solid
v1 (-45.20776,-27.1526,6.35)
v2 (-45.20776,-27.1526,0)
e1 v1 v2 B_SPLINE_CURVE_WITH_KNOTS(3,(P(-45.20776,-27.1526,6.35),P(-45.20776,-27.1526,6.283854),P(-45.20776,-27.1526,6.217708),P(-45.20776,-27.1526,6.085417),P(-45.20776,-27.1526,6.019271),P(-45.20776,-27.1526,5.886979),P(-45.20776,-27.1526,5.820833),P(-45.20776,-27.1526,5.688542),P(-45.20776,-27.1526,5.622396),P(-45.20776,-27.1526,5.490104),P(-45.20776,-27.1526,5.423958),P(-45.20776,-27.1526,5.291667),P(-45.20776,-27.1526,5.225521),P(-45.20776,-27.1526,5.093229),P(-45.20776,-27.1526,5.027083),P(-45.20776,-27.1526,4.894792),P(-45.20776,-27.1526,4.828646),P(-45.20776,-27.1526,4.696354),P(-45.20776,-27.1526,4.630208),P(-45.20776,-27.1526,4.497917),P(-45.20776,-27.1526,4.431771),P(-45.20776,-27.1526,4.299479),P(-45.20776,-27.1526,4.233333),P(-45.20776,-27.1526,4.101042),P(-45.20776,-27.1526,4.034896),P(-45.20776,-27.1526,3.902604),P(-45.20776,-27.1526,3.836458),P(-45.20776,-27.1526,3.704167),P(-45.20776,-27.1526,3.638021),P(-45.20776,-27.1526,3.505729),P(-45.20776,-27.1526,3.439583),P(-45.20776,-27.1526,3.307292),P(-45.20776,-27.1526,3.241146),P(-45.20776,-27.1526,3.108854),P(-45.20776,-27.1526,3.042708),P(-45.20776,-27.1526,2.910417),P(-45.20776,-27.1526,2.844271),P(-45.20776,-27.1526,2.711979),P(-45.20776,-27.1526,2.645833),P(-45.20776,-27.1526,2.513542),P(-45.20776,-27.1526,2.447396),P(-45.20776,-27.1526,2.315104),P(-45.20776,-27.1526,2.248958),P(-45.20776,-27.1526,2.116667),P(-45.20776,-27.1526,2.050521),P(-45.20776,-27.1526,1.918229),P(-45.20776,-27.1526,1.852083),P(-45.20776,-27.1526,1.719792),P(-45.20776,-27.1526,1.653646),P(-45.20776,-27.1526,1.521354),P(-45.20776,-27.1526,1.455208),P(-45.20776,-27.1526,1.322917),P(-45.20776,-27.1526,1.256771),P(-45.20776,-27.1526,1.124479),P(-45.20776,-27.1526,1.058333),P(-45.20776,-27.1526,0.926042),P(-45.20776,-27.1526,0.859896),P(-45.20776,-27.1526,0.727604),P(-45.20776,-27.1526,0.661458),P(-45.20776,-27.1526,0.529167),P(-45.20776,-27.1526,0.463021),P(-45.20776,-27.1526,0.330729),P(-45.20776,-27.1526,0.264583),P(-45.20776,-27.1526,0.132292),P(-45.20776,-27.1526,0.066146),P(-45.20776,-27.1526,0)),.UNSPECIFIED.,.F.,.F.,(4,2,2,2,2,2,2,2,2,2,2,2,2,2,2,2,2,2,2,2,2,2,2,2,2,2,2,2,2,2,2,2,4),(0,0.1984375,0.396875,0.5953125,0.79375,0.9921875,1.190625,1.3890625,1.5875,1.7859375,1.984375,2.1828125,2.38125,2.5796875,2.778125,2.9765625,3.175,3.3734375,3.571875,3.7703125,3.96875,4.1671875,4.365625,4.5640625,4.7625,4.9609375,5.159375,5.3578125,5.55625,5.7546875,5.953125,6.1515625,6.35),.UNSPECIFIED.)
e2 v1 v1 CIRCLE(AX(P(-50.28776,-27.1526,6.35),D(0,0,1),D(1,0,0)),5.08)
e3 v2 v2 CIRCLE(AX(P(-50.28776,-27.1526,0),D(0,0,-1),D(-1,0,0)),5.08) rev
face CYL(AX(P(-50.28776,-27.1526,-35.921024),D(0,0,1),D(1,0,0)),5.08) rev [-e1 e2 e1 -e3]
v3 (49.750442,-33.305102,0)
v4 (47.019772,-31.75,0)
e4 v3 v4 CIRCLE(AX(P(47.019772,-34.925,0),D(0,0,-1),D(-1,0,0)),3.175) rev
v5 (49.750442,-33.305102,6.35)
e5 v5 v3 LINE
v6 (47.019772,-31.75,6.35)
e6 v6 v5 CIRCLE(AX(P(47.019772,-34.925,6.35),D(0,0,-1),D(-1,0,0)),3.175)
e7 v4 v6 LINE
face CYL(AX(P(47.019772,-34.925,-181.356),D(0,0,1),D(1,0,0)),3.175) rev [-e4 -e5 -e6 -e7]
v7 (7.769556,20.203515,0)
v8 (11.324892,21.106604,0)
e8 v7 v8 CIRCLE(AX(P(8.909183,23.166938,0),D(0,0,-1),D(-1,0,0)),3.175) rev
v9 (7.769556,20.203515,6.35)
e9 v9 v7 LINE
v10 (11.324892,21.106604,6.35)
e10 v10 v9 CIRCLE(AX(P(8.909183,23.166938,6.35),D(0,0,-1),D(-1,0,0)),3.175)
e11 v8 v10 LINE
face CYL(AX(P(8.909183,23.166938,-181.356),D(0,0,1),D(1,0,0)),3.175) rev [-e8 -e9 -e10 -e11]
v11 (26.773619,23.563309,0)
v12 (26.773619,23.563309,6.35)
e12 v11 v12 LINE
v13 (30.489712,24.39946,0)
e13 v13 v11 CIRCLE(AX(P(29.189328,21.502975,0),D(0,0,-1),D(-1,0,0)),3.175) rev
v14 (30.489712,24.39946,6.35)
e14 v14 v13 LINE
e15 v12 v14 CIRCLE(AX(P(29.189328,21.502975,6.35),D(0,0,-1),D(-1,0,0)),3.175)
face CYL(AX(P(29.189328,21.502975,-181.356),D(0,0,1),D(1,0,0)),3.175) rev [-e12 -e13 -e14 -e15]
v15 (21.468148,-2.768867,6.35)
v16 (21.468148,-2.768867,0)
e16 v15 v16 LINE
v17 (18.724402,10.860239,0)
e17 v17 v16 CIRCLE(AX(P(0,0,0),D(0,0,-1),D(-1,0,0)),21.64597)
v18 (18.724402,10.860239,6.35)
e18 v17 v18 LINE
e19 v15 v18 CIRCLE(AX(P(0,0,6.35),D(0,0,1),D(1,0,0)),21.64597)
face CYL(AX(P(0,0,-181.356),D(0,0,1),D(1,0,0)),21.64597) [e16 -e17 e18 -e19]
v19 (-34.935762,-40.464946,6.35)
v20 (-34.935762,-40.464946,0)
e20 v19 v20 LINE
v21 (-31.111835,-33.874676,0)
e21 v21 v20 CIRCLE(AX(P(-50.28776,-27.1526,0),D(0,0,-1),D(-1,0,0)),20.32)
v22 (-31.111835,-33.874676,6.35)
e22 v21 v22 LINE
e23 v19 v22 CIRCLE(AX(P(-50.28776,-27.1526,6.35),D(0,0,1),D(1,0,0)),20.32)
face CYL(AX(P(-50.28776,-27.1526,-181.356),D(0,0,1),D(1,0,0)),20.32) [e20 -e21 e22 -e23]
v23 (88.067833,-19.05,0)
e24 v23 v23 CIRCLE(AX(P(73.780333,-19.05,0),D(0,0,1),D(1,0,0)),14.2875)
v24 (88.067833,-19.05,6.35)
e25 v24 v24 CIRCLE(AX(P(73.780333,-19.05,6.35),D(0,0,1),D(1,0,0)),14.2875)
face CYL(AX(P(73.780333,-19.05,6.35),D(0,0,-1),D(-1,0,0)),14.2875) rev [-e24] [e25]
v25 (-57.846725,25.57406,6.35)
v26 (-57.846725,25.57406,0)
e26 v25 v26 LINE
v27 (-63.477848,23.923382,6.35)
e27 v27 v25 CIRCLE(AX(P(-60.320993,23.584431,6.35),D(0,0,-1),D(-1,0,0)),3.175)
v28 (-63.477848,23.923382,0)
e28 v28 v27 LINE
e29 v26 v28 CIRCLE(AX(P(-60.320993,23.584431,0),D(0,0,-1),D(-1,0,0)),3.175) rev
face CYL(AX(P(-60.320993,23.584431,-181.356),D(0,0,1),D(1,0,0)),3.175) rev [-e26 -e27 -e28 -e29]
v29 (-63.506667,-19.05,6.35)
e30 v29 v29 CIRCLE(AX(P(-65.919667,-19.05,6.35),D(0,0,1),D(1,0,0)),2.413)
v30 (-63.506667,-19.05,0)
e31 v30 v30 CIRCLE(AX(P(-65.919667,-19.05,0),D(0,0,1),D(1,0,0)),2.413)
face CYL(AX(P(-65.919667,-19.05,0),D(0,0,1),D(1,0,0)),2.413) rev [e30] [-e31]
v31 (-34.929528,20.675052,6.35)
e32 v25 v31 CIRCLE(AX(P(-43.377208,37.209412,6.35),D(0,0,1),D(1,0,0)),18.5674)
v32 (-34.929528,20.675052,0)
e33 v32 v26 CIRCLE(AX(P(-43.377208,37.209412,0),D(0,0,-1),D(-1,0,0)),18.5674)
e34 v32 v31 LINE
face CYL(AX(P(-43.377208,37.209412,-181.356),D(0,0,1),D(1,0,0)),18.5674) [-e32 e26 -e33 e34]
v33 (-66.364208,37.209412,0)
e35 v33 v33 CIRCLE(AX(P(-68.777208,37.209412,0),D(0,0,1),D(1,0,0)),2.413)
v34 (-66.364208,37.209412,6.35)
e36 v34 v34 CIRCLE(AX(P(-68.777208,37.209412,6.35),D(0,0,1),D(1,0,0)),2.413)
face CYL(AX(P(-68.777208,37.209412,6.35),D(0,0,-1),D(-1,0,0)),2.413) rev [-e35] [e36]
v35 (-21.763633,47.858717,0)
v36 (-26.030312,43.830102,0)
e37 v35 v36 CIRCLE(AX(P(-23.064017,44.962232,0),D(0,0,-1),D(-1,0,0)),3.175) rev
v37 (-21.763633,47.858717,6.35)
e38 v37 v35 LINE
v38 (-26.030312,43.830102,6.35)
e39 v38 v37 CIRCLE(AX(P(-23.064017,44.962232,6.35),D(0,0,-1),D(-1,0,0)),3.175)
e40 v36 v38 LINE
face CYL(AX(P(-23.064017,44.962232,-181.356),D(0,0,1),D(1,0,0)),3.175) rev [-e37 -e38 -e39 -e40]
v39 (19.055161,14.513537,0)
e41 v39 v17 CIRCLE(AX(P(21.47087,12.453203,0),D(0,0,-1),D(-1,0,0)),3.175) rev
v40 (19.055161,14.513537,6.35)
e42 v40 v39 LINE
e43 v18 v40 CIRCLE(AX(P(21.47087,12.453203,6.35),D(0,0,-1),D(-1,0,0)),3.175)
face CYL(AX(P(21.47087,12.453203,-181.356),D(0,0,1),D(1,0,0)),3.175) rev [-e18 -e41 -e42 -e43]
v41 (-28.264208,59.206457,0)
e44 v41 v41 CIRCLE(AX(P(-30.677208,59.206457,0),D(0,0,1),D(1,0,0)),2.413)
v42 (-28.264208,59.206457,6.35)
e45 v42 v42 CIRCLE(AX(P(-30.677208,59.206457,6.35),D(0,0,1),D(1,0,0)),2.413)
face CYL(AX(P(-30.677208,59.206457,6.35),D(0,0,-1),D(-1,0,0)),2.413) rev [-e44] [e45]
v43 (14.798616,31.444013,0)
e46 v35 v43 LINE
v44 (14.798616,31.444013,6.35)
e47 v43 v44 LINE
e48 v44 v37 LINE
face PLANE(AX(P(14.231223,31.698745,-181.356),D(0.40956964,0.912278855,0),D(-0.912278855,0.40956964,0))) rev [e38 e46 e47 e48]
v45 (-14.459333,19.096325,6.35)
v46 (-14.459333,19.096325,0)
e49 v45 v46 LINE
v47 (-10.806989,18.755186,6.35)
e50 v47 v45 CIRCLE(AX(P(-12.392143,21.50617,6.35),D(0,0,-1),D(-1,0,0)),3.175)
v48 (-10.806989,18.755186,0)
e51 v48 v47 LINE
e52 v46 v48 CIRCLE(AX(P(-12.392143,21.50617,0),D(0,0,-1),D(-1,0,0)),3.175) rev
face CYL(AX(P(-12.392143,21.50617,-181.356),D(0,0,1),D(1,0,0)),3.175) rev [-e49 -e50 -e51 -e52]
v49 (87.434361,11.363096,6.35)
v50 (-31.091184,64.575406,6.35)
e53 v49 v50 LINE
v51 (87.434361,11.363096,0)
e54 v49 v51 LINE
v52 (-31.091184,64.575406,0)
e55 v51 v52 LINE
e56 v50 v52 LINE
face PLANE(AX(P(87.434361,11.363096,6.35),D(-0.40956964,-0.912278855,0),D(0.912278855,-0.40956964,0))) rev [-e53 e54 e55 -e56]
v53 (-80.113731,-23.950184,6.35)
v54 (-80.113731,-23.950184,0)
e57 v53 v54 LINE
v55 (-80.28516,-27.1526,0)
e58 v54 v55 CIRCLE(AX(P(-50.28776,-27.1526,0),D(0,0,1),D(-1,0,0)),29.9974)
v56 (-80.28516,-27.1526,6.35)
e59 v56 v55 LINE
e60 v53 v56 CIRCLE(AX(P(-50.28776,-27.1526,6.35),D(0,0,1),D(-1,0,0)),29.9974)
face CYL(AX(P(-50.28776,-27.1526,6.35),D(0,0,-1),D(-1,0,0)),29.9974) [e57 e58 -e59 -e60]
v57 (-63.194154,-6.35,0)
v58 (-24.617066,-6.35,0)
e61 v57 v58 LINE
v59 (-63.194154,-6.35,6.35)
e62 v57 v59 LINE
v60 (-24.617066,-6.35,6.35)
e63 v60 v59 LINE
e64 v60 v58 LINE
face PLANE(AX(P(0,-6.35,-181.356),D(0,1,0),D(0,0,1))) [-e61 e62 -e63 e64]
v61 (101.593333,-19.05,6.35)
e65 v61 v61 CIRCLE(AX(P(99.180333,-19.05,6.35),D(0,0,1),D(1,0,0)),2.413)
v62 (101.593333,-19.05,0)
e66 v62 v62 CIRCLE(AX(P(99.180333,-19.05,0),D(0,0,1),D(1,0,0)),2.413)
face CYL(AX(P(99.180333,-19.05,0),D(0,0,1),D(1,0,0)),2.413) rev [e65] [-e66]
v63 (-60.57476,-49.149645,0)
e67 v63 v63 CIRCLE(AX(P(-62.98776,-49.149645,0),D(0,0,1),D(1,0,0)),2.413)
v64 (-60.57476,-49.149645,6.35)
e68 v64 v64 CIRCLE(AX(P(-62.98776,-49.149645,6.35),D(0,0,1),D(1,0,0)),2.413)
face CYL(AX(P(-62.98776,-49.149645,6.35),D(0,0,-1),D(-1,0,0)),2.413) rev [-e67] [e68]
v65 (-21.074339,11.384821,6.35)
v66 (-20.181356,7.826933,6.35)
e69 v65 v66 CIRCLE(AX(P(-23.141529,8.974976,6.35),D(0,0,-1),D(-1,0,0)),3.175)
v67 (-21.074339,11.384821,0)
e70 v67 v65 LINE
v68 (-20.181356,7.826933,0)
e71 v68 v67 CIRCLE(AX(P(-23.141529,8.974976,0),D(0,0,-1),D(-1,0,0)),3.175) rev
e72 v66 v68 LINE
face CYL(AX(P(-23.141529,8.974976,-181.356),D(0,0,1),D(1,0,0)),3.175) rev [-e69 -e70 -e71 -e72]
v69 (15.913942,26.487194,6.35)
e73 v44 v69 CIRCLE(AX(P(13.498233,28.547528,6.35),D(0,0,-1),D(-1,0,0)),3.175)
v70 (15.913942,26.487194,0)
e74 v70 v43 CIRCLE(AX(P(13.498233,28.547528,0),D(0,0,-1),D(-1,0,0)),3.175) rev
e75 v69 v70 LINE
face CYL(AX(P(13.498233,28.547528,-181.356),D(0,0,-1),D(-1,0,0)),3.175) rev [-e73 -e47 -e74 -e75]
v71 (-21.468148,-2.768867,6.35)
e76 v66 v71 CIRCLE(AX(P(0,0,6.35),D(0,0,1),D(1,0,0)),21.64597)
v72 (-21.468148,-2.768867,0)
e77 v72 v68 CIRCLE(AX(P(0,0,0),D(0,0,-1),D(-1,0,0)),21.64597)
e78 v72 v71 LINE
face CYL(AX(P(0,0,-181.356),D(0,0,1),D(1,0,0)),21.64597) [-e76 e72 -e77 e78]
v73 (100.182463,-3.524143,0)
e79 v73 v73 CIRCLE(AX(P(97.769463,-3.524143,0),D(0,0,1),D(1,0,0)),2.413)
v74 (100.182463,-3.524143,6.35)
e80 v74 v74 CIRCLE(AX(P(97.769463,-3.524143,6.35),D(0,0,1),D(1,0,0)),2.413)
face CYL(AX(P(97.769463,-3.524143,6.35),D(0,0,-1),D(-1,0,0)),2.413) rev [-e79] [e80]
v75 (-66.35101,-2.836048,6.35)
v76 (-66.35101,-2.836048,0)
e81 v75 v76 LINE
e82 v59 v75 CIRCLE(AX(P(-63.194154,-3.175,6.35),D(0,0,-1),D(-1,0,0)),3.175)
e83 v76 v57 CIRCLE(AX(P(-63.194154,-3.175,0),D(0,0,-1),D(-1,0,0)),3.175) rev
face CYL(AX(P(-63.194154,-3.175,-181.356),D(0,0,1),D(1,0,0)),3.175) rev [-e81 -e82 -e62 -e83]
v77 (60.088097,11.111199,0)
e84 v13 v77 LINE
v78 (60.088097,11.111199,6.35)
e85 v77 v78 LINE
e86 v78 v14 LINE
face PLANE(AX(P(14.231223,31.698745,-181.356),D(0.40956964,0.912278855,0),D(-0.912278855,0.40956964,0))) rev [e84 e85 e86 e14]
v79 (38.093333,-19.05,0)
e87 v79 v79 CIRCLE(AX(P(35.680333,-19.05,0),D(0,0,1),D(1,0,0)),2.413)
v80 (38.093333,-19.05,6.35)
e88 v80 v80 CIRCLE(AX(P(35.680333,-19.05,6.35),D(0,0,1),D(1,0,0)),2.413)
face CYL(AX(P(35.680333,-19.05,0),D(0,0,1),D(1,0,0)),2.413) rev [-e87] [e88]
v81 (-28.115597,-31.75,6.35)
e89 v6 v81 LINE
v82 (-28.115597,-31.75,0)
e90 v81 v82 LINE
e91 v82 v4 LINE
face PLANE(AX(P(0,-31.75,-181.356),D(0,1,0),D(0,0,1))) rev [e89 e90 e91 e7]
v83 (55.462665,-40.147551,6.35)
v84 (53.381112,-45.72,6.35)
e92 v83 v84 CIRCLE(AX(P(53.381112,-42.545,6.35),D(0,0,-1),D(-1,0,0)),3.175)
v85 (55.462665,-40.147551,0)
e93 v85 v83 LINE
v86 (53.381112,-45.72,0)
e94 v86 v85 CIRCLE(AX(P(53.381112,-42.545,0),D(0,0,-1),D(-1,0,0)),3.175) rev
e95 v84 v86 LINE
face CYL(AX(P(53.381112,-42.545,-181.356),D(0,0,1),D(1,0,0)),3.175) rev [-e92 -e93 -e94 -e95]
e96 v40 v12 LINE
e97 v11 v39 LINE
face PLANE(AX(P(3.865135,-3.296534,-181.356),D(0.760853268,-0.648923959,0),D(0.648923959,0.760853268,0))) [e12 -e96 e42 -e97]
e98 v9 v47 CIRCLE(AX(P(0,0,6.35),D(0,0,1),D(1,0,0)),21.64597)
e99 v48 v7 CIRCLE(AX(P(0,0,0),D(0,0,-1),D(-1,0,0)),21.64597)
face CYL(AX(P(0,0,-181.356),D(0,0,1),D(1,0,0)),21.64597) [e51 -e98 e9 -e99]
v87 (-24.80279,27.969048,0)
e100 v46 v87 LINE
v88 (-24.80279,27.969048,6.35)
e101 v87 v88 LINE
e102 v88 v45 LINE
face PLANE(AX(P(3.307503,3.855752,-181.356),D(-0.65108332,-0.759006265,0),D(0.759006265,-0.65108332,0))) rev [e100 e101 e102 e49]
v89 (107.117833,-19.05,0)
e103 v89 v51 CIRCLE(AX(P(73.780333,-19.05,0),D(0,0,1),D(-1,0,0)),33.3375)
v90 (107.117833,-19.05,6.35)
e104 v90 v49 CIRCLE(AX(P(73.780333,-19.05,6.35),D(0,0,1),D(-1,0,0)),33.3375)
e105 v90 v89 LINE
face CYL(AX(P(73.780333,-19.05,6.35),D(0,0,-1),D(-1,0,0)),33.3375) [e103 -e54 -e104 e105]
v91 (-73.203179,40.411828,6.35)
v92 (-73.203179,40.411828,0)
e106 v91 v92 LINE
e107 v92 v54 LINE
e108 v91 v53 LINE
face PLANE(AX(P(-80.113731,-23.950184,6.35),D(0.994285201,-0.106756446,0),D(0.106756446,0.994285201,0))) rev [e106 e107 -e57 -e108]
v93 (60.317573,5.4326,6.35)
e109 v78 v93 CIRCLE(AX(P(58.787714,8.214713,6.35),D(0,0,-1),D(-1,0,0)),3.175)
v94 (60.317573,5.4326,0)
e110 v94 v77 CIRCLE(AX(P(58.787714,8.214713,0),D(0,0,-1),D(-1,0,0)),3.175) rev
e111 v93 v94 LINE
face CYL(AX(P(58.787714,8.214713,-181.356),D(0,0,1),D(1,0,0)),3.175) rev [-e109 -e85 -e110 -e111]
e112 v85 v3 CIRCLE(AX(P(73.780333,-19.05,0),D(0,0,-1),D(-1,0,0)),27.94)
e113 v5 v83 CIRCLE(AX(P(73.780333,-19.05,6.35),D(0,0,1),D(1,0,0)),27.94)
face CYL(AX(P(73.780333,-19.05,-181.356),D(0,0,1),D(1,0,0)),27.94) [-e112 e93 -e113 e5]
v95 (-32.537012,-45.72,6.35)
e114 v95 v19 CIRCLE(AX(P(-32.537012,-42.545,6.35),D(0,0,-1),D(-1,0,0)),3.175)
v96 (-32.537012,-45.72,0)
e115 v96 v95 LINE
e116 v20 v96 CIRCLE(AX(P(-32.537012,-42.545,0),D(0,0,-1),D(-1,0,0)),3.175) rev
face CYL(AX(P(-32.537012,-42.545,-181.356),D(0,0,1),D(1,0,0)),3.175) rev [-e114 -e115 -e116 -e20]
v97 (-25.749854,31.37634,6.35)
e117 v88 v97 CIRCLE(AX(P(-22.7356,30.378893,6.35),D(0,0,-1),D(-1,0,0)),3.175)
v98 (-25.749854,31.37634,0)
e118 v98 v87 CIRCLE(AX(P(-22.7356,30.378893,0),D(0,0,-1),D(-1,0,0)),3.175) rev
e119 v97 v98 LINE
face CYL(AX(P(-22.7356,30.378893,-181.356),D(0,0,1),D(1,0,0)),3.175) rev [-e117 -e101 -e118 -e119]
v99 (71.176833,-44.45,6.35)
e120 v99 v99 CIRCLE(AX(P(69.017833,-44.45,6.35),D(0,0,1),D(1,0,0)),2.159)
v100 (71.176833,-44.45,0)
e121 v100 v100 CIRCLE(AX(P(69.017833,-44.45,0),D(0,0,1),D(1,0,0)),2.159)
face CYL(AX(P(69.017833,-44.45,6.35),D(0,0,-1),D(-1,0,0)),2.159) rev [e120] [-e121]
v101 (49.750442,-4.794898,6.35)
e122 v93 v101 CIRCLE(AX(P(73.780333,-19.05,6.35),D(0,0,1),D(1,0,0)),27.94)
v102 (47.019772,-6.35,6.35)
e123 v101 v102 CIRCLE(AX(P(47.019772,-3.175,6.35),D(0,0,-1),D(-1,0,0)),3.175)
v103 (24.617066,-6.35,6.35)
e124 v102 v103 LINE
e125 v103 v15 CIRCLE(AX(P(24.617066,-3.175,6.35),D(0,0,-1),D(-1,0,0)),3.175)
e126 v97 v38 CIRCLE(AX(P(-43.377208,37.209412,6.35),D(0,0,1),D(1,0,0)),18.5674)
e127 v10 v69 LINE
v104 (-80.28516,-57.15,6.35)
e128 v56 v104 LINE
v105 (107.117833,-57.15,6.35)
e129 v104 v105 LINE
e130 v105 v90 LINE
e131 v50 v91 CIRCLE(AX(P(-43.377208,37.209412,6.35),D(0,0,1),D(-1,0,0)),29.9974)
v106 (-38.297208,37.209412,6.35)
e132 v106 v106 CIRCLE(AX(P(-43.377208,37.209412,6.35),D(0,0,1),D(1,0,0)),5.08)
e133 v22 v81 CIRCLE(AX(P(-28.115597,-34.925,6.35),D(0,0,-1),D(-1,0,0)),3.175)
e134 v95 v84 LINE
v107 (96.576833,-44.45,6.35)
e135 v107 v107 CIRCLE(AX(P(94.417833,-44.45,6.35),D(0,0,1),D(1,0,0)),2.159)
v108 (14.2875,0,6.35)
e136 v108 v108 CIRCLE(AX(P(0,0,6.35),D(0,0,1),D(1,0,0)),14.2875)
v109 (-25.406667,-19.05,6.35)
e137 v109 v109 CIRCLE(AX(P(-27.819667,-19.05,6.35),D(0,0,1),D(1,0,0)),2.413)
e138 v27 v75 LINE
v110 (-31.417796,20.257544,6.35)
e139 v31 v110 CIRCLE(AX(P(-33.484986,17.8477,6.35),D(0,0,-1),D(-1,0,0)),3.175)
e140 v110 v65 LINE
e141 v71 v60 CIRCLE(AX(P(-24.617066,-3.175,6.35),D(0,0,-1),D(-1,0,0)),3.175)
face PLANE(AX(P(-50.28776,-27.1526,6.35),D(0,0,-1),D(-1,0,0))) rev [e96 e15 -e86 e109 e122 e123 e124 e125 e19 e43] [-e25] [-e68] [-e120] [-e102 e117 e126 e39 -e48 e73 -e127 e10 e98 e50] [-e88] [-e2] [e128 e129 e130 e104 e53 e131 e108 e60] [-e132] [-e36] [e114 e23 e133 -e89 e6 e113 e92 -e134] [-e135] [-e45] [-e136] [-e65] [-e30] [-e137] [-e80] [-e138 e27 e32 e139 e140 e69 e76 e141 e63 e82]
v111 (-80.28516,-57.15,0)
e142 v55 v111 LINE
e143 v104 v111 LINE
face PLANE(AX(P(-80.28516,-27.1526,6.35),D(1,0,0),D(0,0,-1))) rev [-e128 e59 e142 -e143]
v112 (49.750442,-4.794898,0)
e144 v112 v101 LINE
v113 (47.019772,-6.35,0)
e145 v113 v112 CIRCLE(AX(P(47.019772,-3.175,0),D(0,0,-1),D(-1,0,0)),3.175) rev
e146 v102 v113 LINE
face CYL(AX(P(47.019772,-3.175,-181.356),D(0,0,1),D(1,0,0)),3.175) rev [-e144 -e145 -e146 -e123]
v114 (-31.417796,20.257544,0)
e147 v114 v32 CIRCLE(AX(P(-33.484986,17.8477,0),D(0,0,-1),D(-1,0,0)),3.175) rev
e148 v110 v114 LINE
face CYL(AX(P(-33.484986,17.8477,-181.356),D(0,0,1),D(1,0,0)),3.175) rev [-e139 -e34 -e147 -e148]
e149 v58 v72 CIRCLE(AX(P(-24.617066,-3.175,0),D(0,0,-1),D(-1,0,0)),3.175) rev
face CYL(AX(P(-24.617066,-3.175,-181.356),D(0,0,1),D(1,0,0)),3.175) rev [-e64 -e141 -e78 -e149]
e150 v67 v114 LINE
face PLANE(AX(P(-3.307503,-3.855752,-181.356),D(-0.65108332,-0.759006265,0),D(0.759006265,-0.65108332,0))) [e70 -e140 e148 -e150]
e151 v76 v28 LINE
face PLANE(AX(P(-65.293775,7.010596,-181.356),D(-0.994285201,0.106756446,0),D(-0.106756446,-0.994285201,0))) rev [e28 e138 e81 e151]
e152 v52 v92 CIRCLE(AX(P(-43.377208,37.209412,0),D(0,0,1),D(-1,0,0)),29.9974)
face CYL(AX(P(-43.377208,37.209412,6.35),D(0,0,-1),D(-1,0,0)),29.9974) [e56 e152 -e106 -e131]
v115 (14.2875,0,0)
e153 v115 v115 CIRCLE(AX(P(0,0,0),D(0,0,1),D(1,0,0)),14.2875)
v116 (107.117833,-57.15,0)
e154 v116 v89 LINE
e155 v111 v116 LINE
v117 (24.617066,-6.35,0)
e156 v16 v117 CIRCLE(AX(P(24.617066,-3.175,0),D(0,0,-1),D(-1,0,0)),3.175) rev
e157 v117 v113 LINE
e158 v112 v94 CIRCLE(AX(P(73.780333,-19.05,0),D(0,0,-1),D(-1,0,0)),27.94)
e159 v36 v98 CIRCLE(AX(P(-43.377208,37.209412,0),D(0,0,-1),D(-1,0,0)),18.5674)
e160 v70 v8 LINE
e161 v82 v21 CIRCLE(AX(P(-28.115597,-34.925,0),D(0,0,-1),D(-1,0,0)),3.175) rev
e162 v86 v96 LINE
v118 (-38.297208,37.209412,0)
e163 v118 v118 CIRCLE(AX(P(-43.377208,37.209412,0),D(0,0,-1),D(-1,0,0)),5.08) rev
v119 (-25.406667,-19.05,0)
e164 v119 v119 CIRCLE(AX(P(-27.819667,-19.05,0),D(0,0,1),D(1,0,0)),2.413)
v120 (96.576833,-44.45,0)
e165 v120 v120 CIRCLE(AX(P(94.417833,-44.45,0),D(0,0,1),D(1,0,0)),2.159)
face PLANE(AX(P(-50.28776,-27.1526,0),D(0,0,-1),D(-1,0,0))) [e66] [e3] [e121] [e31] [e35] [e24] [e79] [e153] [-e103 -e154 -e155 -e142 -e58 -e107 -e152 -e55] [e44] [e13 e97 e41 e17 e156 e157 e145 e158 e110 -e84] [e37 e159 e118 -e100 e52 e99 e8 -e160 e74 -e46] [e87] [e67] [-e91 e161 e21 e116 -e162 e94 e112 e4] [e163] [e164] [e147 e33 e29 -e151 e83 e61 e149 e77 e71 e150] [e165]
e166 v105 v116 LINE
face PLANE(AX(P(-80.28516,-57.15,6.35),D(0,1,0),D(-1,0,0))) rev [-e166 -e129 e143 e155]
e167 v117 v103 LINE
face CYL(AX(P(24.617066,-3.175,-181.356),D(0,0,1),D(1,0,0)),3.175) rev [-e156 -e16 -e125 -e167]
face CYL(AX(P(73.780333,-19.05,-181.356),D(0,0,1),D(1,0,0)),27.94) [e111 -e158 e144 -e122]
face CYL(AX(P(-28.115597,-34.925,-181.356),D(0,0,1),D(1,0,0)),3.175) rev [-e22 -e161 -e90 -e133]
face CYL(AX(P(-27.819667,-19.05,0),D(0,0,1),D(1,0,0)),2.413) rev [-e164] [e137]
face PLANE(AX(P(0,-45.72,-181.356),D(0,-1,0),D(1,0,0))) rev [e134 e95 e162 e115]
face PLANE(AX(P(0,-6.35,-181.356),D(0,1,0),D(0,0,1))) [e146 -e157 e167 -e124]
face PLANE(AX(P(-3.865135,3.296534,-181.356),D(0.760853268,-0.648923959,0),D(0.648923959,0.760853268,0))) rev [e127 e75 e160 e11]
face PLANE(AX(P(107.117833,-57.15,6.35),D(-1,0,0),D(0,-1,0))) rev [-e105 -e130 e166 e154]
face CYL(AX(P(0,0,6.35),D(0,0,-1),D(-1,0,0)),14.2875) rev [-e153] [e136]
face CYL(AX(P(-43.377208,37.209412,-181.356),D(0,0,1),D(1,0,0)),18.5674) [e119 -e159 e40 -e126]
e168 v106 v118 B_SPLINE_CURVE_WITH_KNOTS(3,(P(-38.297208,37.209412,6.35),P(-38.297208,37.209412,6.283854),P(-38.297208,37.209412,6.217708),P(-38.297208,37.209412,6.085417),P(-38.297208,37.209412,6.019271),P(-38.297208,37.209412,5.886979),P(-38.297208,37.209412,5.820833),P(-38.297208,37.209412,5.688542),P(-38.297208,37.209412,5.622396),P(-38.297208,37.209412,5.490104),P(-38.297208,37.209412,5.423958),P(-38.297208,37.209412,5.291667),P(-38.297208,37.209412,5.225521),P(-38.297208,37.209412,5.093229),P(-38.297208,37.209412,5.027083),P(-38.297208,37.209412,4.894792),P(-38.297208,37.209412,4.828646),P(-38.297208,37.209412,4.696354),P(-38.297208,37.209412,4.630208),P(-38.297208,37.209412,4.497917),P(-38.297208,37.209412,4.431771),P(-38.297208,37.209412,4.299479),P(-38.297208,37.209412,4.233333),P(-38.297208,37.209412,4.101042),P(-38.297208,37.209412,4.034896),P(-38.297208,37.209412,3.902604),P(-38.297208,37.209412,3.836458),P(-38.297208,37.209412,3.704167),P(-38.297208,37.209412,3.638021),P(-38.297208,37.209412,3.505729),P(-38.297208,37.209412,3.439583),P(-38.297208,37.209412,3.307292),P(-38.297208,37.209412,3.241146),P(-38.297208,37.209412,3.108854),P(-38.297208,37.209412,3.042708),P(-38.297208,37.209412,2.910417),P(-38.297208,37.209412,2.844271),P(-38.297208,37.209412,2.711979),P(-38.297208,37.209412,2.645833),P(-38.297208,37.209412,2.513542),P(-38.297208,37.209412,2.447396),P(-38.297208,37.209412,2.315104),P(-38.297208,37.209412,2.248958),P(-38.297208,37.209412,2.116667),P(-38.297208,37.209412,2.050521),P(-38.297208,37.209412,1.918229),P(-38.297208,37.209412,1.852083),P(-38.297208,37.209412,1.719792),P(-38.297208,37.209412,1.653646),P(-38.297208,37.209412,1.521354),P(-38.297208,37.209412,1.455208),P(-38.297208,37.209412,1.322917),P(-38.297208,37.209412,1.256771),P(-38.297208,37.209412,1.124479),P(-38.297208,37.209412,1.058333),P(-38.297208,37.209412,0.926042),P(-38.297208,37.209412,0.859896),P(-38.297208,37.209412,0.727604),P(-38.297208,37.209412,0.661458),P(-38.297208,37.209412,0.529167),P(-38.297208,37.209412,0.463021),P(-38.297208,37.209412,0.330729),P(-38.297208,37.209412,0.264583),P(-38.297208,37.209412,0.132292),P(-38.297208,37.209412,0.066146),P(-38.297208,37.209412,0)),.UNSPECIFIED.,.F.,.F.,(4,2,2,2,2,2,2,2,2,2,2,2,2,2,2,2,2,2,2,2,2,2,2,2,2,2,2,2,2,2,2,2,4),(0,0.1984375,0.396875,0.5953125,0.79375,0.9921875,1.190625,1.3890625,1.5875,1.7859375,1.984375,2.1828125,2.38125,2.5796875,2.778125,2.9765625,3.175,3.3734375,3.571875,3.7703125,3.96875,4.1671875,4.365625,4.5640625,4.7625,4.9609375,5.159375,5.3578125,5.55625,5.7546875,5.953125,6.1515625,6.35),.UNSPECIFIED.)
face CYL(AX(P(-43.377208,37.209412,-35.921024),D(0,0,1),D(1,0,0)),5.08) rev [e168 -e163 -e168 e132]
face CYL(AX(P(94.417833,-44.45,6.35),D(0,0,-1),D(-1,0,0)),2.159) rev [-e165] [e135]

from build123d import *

# Parameters (mm, degrees)
SKETCH1_R           = 14.2875
SKETCH1_R_2         = 12.7
SKETCH1_R_3         = 2.413
SKETCH1_R_4         = 2.159
BOSS_EXTRUDE1_DEPTH = 6.35
BOSS_EXTRUDE2_START = -6.35
SKETCH2_R           = 2.413
SKETCH2_R_2         = 2.685559378
SKETCH2_R_3         = 7.691429031
SKETCH2_R_4         = 5.034548369
SKETCH2_R_5         = 5.920725106
SKETCH2_R_6         = 7.734401209
SKETCH2_R_7         = 5.621863984
SKETCH2_R_8         = 3.605638589
BOSS_EXTRUDE2_DEPTH = 6.35
SKETCH3_R           = 2.413
CUT_EXTRUDE1_DEPTH  = 127.614802212
BOSS_EXTRUDE3_START = -6.35
SKETCH4_R           = 12.7
SKETCH4_R_2         = 5.08
BOSS_EXTRUDE3_DEPTH = 6.35
CUT_EXTRUDE3_DEPTH  = 187.706
FILLET2_R           = 3.175


with BuildPart() as part:
    # Sketch1 → Boss-Extrude1 (new body)
    with BuildSketch(Plane.XY):
        with BuildLine():
            Line((-80.285160074, -57.15), (107.117832745, -57.15))
            Line((107.117832745, -57.15), (107.117832745, -19.05))
            ThreePointArc((107.117832745, -19.05), (101.76765184, -0.936500169), (87.434360611, 11.363096345))
            Line((87.434360611, 11.363096345), (-31.091183717, 64.575405501))
            ThreePointArc((-31.091183717, 64.575405501), (-58.306442976, 63.227904236), (-73.203178923, 40.411827573))
            Line((-73.203178923, 40.411827573), (-80.113730967, -23.950184188))
            ThreePointArc((-80.113730967, -23.950184188), (-80.242272138, -25.549099535), (-80.285160074, -27.1526))
            Line((-80.285160074, -27.1526), (-80.285160074, -57.15))
        make_face()
        Circle(SKETCH1_R, mode=Mode.SUBTRACT)
        with Locations((-43.377208029, 37.209411761)):
            Circle(SKETCH1_R_2, mode=Mode.SUBTRACT)
        with Locations((-50.287760074, -27.1526)):
            Circle(SKETCH1_R_2, mode=Mode.SUBTRACT)
        with Locations((73.780332745, -19.05)):
            Circle(SKETCH1_R, mode=Mode.SUBTRACT)
        with Locations((-68.777208029, 37.209411761)):
            Circle(SKETCH1_R_3, mode=Mode.SUBTRACT)
        with Locations((-17.977208029, 37.209411761)):
            Circle(SKETCH1_R_3, mode=Mode.SUBTRACT)
        with Locations((-56.077208029, 59.206457017)):
            Circle(SKETCH1_R_3, mode=Mode.SUBTRACT)
        with Locations((-30.677208029, 59.206457017)):
            Circle(SKETCH1_R_3, mode=Mode.SUBTRACT)
        with Locations((-56.077208029, 15.212366505)):
            Circle(SKETCH1_R_3, mode=Mode.SUBTRACT)
        with Locations((-30.677208029, 15.212366505)):
            Circle(SKETCH1_R_3, mode=Mode.SUBTRACT)
        with Locations((-62.987760074, -5.155554744)):
            Circle(SKETCH1_R_3, mode=Mode.SUBTRACT)
        with Locations((-75.687760074, -27.1526)):
            Circle(SKETCH1_R_3, mode=Mode.SUBTRACT)
        with Locations((-62.987760074, -49.149645256)):
            Circle(SKETCH1_R_3, mode=Mode.SUBTRACT)
        with Locations((-37.587760074, -49.149645256)):
            Circle(SKETCH1_R_3, mode=Mode.SUBTRACT)
        with Locations((-24.887760074, -27.1526)):
            Circle(SKETCH1_R_3, mode=Mode.SUBTRACT)
        with Locations((-37.587760074, -5.155554744)):
            Circle(SKETCH1_R_3, mode=Mode.SUBTRACT)
        with Locations((94.417832745, -44.45)):
            Circle(SKETCH1_R_4, mode=Mode.SUBTRACT)
        with Locations((97.769463398, -3.524143002)):
            Circle(SKETCH1_R_3, mode=Mode.SUBTRACT)
        with Locations((69.017832745, -44.45)):
            Circle(SKETCH1_R_4, mode=Mode.SUBTRACT)
    extrude(amount=BOSS_EXTRUDE1_DEPTH)

    # Sketch2 → Boss-Extrude2 (add)
    with BuildSketch(Plane.XY.offset(6.35).offset(BOSS_EXTRUDE2_START)):
        with Locations((-56.077208029, 59.206457017)):
            Circle(SKETCH2_R)
        with Locations((-17.977208029, 37.209411761)):
            Circle(SKETCH2_R_2)
        with Locations((-30.677208029, 15.212366505)):
            Circle(SKETCH2_R_3)
        with Locations((-56.077208029, 15.212366505)):
            Circle(SKETCH2_R_4)
        with Locations((-75.687760074, -27.1526)):
            Circle(SKETCH2_R)
        with Locations((-37.587760074, -49.149645256)):
            Circle(SKETCH2_R_5)
        with Locations((-24.887760074, -27.1526)):
            Circle(SKETCH2_R_6)
        with Locations((-37.587760074, -5.155554744)):
            Circle(SKETCH2_R_7)
        with Locations((-62.987760074, -5.155554744)):
            Circle(SKETCH2_R_8)
    extrude(amount=BOSS_EXTRUDE2_DEPTH)

    # Sketch3 → Cut-Extrude1 (cut, through all)
    with BuildSketch(Plane.XY.offset(6.35)):
        with Locations((-65.919667255, -19.05)):
            Circle(SKETCH3_R)
        with Locations((-27.819667255, -19.05)):
            Circle(SKETCH3_R)
        with Locations((99.180332745, -19.05)):
            Circle(SKETCH3_R)
        with Locations((35.680332745, -19.05)):
            Circle(SKETCH3_R)
    extrude(amount=-CUT_EXTRUDE1_DEPTH, mode=Mode.SUBTRACT)

    # Sketch4 → Boss-Extrude3 (add)
    # profile 1 of 2: a face of its own
    with BuildSketch(Plane.XY.offset(6.35).offset(BOSS_EXTRUDE3_START)):
        with Locations((-50.287760074, -27.1526)):
            Circle(SKETCH4_R)
        with Locations((-50.287760074, -27.1526)):
            Circle(SKETCH4_R_2, mode=Mode.SUBTRACT)
    # profile 2 of 2: a face of its own
    with BuildSketch(Plane.XY.offset(6.35).offset(BOSS_EXTRUDE3_START)):
        with Locations((-43.377208029, 37.209411761)):
            Circle(SKETCH4_R)
        with Locations((-43.377208029, 37.209411761)):
            Circle(SKETCH4_R_2, mode=Mode.SUBTRACT)
    extrude(amount=BOSS_EXTRUDE3_DEPTH)

    # Sketch6 → Cut-Extrude3 (cut)
    with BuildSketch(Plane.XY.offset(6.35)):
        with BuildLine():
            Line((48.893516959, -31.75), (-30.494672562, -31.75))
            ThreePointArc((-30.494672562, -31.75), (-34.620223563, -40.092101524), (-42.032213015, -45.72))
            Line((-42.032213015, -45.72), (65.452385819, -45.72))
            ThreePointArc((65.452385819, -45.72), (55.763803098, -40.405286453), (48.893516959, -31.75))
        make_face()
        with BuildLine():
            ThreePointArc((21.645969932, 0), (21.406556056, -3.210509638), (20.69361047, -6.35))
            Line((20.69361047, -6.35), (48.893516959, -6.35))
            ThreePointArc((48.893516959, -6.35), (56.358698753, 2.793311769), (66.933289757, 8.038034302))
            Line((66.933289757, 8.038034302), (28.318236786, 25.374349004))
            Line((28.318236786, 25.374349004), (17.519420156, 12.712904141))
            ThreePointArc((17.519420156, 12.712904141), (20.588502328, 6.682932454), (21.645969932, 0))
        make_face()
        with BuildLine():
            Line((-66.728302826, -6.35), (-20.69361047, -6.35))
            ThreePointArc((-20.69361047, -6.35), (-21.56374561, 1.884911026), (-19.278077532, 9.843969777))
            Line((-19.278077532, 9.843969777), (-33.129659603, 21.725998248))
            ThreePointArc((-33.129659603, 21.725998248), (-53.027504153, 21.346873266), (-61.838499073, 39.191601395))
            Line((-61.838499073, 39.191601395), (-66.728302826, -6.35))
        make_face()
        with BuildLine():
            Line((18.662178143, 29.709458205), (-35.7725647, 54.148058182))
            ThreePointArc((-35.7725647, 54.148058182), (-27.789604023, 47.297768619), (-24.809808029, 37.209411761))
            ThreePointArc((-24.809808029, 37.209411761), (-25.241026709, 33.231061615), (-26.514653067, 29.437501898))
            Line((-26.514653067, 29.437501898), (-12.663070997, 17.555473427))
            ThreePointArc((-12.663070997, 17.555473427), (-1.682532329, 21.580479588), (9.789150952, 19.305971562))
            Line((9.789150952, 19.305971562), (18.662178143, 29.709458205))
        make_face()
    extrude(amount=-CUT_EXTRUDE3_DEPTH, mode=Mode.SUBTRACT)

    # Fillet2
    # the kernel refuses this fillet: 3.175 mm, written as the material it adds along each edge
    with BuildSketch(Plane(origin=(-42.032213015, -45.72, 6.35), x_dir=(0.8036425681302507, 0.5951122773805085, 0), z_dir=(0, 0, -1))) as fillet2_piece_1:
        with BuildLine():
            CenterArc((9.520228984, 3.09914538), FILLET2_R, 126.520636513, 130.92989741)
            Line((7.630747504, 5.650710534), (0, 0))
            ThreePointArc((0, 0), (4.415178659, 0.485469569), (8.830357319, 0))
        make_face()
    extrude(amount=6.35)
    with BuildSketch(Plane(origin=(-30.494672562, -31.75, 6.35), x_dir=(1, 0, 0), z_dir=(0, 0, -1))) as fillet2_piece_2:
        with BuildLine():
            CenterArc((2.37907574, 3.175), FILLET2_R, 199.317995786, 70.682004214)
            ThreePointArc((-0.617162538, 2.124675676), (-0.27964227, 1.070743858), (0, 0))
            Line((0, 0), (2.37907574, 0))
        make_face()
    extrude(amount=6.35)
    with BuildSketch(Plane(origin=(48.893516959, -31.75, 6.35), x_dir=(-1, 0, 0), z_dir=(0, 0, -1))) as fillet2_piece_3:
        with BuildLine():
            CenterArc((1.873744746, -3.175), FILLET2_R, 90, 59.322575527)
            ThreePointArc((-0.856924696, -1.555102041), (-0.416105979, -0.784359884), (0, 0))
            Line((0, 0), (1.873744746, 0))
        make_face()
    extrude(amount=6.35)
    with BuildSketch(Plane(origin=(65.452385819, -45.72, 6.35), x_dir=(-1, 0, 0), z_dir=(0, 0, -1))) as fillet2_piece_4:
        with BuildLine():
            CenterArc((12.071273647, 3.175), FILLET2_R, 130.96571333, 139.03428667)
            ThreePointArc((9.989720528, 5.57244898), (5.283086772, 2.269521282), (0, 0))
            Line((0, 0), (12.071273647, 0))
        make_face()
    extrude(amount=6.35)
    with BuildSketch(Plane(origin=(-26.514653067, 29.437501898, 6.35), x_dir=(0.3669458534357753, 0.9302423021161157, 0), z_dir=(0, 0, -1))) as fillet2_piece_5:
        with BuildLine():
            CenterArc((2.262429591, 3.16999522), FILLET2_R, 199.095946459, 67.686577367)
            Line((-0.737856699, 2.131290651), (0, 0))
            ThreePointArc((0, 0), (1.042114701, 0.029267955), (2.084229403, 0))
        make_face()
    extrude(amount=6.35)
    with BuildSketch(Plane(origin=(-35.7725647, 54.148058182, 6.35), x_dir=(0.9122788554907602, -0.40956963977383487, 0), z_dir=(0, 0, -1))) as fillet2_piece_6:
        with BuildLine():
            CenterArc((15.355975384, 3.175), FILLET2_R, 134.932127283, 135.067872717)
            ThreePointArc((13.113572437, 5.422721963), (7.095274757, 1.409153619), (0, 0))
            Line((0, 0), (15.355975384, 0))
        make_face()
    extrude(amount=6.35)
    with BuildSketch(Plane(origin=(18.662178143, 29.709458205, 6.35), x_dir=(-0.6489239587910223, -0.7608532681844692, 0), z_dir=(0, 0, -1))) as fillet2_piece_7:
        with BuildLine():
            CenterArc((FILLET2_R * 1.33387923601, FILLET2_R), FILLET2_R, 163.717281089, 106.282718911)
            Line((FILLET2_R * 0.373989335277, FILLET2_R * 1.28037720746), (0, 0))
            Line((0, 0), (FILLET2_R * 1.33387923601, 0))
        make_face()
    extrude(amount=6.35)
    with BuildSketch(Plane(origin=(9.789150952, 19.305971562, 6.35), x_dir=(0.648923958791122, 0.7608532681843841, 0), z_dir=(0, 0, -1))) as fillet2_piece_8:
        with BuildLine():
            CenterArc((2.366596481, -3.175), FILLET2_R, 90, 70.574451628)
            ThreePointArc((-0.627664905, -2.119053151), (-0.286770358, -1.067542385), (0, 0))
            Line((0, 0), (2.366596481, 0))
        make_face()
    extrude(amount=6.35)
    with BuildSketch(Plane(origin=(-12.663070997, 17.555473427, 6.35), x_dir=(-0.7590062647283117, 0.6510833204000669, 0), z_dir=(0, 0, -1)), Plane(origin=(17.519420156, 12.712904141, 6.35), x_dir=(0.6489239587910582, 0.7608532681844384, 0), z_dir=(0, 0, -1))) as fillet2_piece_9:
        with BuildLine():
            CenterArc((2.366596481, 3.175), FILLET2_R, 199.425548372, 70.574451628)
            ThreePointArc((-0.627664905, 2.119053151), (-0.286770358, 1.067542385), (0, 0))
            Line((0, 0), (2.366596481, 0))
        make_face()
    extrude(amount=6.35)
    with BuildSketch(Plane(origin=(-61.838499073, 39.191601395, 6.35), x_dir=(-0.10675644594996386, -0.9942852011611821, 0), z_dir=(0, 0, -1))) as fillet2_piece_10:
        with BuildLine():
            CenterArc((15.355975384, -3.175), FILLET2_R, 90, 135.067872717)
            ThreePointArc((13.113572437, -5.422721963), (7.095274757, -1.409153619), (0, 0))
            Line((0, 0), (15.355975384, 0))
        make_face()
    extrude(amount=6.35)
    with BuildSketch(Plane(origin=(-33.129659603, 21.725998248, 6.35), x_dir=(0.7590062647282139, -0.6510833204001809, 0), z_dir=(0, 0, -1))) as fillet2_piece_11:
        with BuildLine():
            CenterArc((2.255400706, 3.175), FILLET2_R, 202.313422633, 67.686577367)
            ThreePointArc((-0.681857828, 1.969538551), (-0.313271514, 0.994344318), (0, 0))
            Line((0, 0), (2.255400706, 0))
        make_face()
    extrude(amount=6.35)
    with BuildSketch(Plane(origin=(-19.278077532, 9.843969777, 6.35), x_dir=(-0.40871289434840824, -0.9126630100937293, 0), z_dir=(0, 0, -1))) as fillet2_piece_12:
        with BuildLine():
            CenterArc((2.372140408, 3.170860102), FILLET2_R, 196.499323021, 70.574451628)
            Line((-0.672122904, 2.269147352), (0, 0))
            ThreePointArc((0, 0), (1.105028222, 0.028224283), (2.210056445, 0))
        make_face()
    extrude(amount=6.35)
    with BuildSketch(Plane(origin=(-20.69361047, -6.35, 6.35), x_dir=(-1, 0, 0), z_dir=(0, 0, -1))) as fillet2_piece_13:
        with BuildLine():
            CenterArc((3.923455223, 3.175), FILLET2_R, 172.650815641, 97.349184359)
            ThreePointArc((0.774537845, 3.581133404), (0.463175795, 1.774149345), (0, 0))
            Line((0, 0), (3.923455223, 0))
        make_face()
    extrude(amount=6.35)
    with BuildSketch(Plane(origin=(-66.728302826, -6.35, 6.35), x_dir=(0.10675644594995837, 0.9942852011611827, 0), z_dir=(0, 0, -1))) as fillet2_piece_14:
        with BuildLine():
            CenterArc((FILLET2_R * 1.11311768963, FILLET2_R), FILLET2_R, 173.871627619, 96.128372381)
            Line((FILLET2_R * 0.118832488469, FILLET2_R * 1.10675644595), (0, 0))
            Line((0, 0), (FILLET2_R * 1.11311768963, 0))
        make_face()
    extrude(amount=6.35)
    with BuildSketch(Plane(origin=(66.933289757, 8.038034302, 6.35), x_dir=(-0.9304446977974599, -0.3664323461985766, 0), z_dir=(0, 0, -1))) as fillet2_piece_15:
        with BuildLine():
            CenterArc((7.514267093, 3.149192718), FILLET2_R, 135.673561463, 127.0162006)
            Line((5.242966133, 5.367709553), (0, 0))
            ThreePointArc((0, 0), (3.555137119, 0.227104084), (7.110274239, 0))
        make_face()
    extrude(amount=6.35)
    with BuildSketch(Plane(origin=(48.893516959, -6.35, 6.35), x_dir=(-1, 0, 0), z_dir=(0, 0, -1))) as fillet2_piece_16:
        with BuildLine():
            CenterArc((1.873744746, 3.175), FILLET2_R, 210.677424473, 59.322575527)
            ThreePointArc((-0.856924696, 1.555102041), (-0.416105979, 0.784359884), (0, 0))
            Line((0, 0), (1.873744746, 0))
        make_face()
    extrude(amount=6.35)
    with BuildSketch(Plane(origin=(20.69361047, -6.35, 6.35), x_dir=(1, 0, 0), z_dir=(0, 0, -1))) as fillet2_piece_17:
        with BuildLine():
            CenterArc((3.923455223, -3.175), FILLET2_R, 90, 97.349184359)
            ThreePointArc((0.774537845, -3.581133404), (0.463175795, -1.774149345), (0, 0))
            Line((0, 0), (3.923455223, 0))
        make_face()
    extrude(amount=6.35)
    with BuildSketch(Plane(origin=(28.318236786, 25.374349004, 6.35), x_dir=(0.9122788554907597, -0.4095696397738357, 0), z_dir=(0, 0, -1))) as fillet2_piece_18:
        with BuildLine():
            CenterArc((FILLET2_R * 0.749693055413, FILLET2_R), FILLET2_R, 196.282718911, 73.717281089)
            Line((-FILLET2_R * 0.210196845325, FILLET2_R * 0.719622792545), (0, 0))
            Line((0, 0), (FILLET2_R * 0.749693055413, 0))
        make_face()
    extrude(amount=6.35)


solid = part.part
